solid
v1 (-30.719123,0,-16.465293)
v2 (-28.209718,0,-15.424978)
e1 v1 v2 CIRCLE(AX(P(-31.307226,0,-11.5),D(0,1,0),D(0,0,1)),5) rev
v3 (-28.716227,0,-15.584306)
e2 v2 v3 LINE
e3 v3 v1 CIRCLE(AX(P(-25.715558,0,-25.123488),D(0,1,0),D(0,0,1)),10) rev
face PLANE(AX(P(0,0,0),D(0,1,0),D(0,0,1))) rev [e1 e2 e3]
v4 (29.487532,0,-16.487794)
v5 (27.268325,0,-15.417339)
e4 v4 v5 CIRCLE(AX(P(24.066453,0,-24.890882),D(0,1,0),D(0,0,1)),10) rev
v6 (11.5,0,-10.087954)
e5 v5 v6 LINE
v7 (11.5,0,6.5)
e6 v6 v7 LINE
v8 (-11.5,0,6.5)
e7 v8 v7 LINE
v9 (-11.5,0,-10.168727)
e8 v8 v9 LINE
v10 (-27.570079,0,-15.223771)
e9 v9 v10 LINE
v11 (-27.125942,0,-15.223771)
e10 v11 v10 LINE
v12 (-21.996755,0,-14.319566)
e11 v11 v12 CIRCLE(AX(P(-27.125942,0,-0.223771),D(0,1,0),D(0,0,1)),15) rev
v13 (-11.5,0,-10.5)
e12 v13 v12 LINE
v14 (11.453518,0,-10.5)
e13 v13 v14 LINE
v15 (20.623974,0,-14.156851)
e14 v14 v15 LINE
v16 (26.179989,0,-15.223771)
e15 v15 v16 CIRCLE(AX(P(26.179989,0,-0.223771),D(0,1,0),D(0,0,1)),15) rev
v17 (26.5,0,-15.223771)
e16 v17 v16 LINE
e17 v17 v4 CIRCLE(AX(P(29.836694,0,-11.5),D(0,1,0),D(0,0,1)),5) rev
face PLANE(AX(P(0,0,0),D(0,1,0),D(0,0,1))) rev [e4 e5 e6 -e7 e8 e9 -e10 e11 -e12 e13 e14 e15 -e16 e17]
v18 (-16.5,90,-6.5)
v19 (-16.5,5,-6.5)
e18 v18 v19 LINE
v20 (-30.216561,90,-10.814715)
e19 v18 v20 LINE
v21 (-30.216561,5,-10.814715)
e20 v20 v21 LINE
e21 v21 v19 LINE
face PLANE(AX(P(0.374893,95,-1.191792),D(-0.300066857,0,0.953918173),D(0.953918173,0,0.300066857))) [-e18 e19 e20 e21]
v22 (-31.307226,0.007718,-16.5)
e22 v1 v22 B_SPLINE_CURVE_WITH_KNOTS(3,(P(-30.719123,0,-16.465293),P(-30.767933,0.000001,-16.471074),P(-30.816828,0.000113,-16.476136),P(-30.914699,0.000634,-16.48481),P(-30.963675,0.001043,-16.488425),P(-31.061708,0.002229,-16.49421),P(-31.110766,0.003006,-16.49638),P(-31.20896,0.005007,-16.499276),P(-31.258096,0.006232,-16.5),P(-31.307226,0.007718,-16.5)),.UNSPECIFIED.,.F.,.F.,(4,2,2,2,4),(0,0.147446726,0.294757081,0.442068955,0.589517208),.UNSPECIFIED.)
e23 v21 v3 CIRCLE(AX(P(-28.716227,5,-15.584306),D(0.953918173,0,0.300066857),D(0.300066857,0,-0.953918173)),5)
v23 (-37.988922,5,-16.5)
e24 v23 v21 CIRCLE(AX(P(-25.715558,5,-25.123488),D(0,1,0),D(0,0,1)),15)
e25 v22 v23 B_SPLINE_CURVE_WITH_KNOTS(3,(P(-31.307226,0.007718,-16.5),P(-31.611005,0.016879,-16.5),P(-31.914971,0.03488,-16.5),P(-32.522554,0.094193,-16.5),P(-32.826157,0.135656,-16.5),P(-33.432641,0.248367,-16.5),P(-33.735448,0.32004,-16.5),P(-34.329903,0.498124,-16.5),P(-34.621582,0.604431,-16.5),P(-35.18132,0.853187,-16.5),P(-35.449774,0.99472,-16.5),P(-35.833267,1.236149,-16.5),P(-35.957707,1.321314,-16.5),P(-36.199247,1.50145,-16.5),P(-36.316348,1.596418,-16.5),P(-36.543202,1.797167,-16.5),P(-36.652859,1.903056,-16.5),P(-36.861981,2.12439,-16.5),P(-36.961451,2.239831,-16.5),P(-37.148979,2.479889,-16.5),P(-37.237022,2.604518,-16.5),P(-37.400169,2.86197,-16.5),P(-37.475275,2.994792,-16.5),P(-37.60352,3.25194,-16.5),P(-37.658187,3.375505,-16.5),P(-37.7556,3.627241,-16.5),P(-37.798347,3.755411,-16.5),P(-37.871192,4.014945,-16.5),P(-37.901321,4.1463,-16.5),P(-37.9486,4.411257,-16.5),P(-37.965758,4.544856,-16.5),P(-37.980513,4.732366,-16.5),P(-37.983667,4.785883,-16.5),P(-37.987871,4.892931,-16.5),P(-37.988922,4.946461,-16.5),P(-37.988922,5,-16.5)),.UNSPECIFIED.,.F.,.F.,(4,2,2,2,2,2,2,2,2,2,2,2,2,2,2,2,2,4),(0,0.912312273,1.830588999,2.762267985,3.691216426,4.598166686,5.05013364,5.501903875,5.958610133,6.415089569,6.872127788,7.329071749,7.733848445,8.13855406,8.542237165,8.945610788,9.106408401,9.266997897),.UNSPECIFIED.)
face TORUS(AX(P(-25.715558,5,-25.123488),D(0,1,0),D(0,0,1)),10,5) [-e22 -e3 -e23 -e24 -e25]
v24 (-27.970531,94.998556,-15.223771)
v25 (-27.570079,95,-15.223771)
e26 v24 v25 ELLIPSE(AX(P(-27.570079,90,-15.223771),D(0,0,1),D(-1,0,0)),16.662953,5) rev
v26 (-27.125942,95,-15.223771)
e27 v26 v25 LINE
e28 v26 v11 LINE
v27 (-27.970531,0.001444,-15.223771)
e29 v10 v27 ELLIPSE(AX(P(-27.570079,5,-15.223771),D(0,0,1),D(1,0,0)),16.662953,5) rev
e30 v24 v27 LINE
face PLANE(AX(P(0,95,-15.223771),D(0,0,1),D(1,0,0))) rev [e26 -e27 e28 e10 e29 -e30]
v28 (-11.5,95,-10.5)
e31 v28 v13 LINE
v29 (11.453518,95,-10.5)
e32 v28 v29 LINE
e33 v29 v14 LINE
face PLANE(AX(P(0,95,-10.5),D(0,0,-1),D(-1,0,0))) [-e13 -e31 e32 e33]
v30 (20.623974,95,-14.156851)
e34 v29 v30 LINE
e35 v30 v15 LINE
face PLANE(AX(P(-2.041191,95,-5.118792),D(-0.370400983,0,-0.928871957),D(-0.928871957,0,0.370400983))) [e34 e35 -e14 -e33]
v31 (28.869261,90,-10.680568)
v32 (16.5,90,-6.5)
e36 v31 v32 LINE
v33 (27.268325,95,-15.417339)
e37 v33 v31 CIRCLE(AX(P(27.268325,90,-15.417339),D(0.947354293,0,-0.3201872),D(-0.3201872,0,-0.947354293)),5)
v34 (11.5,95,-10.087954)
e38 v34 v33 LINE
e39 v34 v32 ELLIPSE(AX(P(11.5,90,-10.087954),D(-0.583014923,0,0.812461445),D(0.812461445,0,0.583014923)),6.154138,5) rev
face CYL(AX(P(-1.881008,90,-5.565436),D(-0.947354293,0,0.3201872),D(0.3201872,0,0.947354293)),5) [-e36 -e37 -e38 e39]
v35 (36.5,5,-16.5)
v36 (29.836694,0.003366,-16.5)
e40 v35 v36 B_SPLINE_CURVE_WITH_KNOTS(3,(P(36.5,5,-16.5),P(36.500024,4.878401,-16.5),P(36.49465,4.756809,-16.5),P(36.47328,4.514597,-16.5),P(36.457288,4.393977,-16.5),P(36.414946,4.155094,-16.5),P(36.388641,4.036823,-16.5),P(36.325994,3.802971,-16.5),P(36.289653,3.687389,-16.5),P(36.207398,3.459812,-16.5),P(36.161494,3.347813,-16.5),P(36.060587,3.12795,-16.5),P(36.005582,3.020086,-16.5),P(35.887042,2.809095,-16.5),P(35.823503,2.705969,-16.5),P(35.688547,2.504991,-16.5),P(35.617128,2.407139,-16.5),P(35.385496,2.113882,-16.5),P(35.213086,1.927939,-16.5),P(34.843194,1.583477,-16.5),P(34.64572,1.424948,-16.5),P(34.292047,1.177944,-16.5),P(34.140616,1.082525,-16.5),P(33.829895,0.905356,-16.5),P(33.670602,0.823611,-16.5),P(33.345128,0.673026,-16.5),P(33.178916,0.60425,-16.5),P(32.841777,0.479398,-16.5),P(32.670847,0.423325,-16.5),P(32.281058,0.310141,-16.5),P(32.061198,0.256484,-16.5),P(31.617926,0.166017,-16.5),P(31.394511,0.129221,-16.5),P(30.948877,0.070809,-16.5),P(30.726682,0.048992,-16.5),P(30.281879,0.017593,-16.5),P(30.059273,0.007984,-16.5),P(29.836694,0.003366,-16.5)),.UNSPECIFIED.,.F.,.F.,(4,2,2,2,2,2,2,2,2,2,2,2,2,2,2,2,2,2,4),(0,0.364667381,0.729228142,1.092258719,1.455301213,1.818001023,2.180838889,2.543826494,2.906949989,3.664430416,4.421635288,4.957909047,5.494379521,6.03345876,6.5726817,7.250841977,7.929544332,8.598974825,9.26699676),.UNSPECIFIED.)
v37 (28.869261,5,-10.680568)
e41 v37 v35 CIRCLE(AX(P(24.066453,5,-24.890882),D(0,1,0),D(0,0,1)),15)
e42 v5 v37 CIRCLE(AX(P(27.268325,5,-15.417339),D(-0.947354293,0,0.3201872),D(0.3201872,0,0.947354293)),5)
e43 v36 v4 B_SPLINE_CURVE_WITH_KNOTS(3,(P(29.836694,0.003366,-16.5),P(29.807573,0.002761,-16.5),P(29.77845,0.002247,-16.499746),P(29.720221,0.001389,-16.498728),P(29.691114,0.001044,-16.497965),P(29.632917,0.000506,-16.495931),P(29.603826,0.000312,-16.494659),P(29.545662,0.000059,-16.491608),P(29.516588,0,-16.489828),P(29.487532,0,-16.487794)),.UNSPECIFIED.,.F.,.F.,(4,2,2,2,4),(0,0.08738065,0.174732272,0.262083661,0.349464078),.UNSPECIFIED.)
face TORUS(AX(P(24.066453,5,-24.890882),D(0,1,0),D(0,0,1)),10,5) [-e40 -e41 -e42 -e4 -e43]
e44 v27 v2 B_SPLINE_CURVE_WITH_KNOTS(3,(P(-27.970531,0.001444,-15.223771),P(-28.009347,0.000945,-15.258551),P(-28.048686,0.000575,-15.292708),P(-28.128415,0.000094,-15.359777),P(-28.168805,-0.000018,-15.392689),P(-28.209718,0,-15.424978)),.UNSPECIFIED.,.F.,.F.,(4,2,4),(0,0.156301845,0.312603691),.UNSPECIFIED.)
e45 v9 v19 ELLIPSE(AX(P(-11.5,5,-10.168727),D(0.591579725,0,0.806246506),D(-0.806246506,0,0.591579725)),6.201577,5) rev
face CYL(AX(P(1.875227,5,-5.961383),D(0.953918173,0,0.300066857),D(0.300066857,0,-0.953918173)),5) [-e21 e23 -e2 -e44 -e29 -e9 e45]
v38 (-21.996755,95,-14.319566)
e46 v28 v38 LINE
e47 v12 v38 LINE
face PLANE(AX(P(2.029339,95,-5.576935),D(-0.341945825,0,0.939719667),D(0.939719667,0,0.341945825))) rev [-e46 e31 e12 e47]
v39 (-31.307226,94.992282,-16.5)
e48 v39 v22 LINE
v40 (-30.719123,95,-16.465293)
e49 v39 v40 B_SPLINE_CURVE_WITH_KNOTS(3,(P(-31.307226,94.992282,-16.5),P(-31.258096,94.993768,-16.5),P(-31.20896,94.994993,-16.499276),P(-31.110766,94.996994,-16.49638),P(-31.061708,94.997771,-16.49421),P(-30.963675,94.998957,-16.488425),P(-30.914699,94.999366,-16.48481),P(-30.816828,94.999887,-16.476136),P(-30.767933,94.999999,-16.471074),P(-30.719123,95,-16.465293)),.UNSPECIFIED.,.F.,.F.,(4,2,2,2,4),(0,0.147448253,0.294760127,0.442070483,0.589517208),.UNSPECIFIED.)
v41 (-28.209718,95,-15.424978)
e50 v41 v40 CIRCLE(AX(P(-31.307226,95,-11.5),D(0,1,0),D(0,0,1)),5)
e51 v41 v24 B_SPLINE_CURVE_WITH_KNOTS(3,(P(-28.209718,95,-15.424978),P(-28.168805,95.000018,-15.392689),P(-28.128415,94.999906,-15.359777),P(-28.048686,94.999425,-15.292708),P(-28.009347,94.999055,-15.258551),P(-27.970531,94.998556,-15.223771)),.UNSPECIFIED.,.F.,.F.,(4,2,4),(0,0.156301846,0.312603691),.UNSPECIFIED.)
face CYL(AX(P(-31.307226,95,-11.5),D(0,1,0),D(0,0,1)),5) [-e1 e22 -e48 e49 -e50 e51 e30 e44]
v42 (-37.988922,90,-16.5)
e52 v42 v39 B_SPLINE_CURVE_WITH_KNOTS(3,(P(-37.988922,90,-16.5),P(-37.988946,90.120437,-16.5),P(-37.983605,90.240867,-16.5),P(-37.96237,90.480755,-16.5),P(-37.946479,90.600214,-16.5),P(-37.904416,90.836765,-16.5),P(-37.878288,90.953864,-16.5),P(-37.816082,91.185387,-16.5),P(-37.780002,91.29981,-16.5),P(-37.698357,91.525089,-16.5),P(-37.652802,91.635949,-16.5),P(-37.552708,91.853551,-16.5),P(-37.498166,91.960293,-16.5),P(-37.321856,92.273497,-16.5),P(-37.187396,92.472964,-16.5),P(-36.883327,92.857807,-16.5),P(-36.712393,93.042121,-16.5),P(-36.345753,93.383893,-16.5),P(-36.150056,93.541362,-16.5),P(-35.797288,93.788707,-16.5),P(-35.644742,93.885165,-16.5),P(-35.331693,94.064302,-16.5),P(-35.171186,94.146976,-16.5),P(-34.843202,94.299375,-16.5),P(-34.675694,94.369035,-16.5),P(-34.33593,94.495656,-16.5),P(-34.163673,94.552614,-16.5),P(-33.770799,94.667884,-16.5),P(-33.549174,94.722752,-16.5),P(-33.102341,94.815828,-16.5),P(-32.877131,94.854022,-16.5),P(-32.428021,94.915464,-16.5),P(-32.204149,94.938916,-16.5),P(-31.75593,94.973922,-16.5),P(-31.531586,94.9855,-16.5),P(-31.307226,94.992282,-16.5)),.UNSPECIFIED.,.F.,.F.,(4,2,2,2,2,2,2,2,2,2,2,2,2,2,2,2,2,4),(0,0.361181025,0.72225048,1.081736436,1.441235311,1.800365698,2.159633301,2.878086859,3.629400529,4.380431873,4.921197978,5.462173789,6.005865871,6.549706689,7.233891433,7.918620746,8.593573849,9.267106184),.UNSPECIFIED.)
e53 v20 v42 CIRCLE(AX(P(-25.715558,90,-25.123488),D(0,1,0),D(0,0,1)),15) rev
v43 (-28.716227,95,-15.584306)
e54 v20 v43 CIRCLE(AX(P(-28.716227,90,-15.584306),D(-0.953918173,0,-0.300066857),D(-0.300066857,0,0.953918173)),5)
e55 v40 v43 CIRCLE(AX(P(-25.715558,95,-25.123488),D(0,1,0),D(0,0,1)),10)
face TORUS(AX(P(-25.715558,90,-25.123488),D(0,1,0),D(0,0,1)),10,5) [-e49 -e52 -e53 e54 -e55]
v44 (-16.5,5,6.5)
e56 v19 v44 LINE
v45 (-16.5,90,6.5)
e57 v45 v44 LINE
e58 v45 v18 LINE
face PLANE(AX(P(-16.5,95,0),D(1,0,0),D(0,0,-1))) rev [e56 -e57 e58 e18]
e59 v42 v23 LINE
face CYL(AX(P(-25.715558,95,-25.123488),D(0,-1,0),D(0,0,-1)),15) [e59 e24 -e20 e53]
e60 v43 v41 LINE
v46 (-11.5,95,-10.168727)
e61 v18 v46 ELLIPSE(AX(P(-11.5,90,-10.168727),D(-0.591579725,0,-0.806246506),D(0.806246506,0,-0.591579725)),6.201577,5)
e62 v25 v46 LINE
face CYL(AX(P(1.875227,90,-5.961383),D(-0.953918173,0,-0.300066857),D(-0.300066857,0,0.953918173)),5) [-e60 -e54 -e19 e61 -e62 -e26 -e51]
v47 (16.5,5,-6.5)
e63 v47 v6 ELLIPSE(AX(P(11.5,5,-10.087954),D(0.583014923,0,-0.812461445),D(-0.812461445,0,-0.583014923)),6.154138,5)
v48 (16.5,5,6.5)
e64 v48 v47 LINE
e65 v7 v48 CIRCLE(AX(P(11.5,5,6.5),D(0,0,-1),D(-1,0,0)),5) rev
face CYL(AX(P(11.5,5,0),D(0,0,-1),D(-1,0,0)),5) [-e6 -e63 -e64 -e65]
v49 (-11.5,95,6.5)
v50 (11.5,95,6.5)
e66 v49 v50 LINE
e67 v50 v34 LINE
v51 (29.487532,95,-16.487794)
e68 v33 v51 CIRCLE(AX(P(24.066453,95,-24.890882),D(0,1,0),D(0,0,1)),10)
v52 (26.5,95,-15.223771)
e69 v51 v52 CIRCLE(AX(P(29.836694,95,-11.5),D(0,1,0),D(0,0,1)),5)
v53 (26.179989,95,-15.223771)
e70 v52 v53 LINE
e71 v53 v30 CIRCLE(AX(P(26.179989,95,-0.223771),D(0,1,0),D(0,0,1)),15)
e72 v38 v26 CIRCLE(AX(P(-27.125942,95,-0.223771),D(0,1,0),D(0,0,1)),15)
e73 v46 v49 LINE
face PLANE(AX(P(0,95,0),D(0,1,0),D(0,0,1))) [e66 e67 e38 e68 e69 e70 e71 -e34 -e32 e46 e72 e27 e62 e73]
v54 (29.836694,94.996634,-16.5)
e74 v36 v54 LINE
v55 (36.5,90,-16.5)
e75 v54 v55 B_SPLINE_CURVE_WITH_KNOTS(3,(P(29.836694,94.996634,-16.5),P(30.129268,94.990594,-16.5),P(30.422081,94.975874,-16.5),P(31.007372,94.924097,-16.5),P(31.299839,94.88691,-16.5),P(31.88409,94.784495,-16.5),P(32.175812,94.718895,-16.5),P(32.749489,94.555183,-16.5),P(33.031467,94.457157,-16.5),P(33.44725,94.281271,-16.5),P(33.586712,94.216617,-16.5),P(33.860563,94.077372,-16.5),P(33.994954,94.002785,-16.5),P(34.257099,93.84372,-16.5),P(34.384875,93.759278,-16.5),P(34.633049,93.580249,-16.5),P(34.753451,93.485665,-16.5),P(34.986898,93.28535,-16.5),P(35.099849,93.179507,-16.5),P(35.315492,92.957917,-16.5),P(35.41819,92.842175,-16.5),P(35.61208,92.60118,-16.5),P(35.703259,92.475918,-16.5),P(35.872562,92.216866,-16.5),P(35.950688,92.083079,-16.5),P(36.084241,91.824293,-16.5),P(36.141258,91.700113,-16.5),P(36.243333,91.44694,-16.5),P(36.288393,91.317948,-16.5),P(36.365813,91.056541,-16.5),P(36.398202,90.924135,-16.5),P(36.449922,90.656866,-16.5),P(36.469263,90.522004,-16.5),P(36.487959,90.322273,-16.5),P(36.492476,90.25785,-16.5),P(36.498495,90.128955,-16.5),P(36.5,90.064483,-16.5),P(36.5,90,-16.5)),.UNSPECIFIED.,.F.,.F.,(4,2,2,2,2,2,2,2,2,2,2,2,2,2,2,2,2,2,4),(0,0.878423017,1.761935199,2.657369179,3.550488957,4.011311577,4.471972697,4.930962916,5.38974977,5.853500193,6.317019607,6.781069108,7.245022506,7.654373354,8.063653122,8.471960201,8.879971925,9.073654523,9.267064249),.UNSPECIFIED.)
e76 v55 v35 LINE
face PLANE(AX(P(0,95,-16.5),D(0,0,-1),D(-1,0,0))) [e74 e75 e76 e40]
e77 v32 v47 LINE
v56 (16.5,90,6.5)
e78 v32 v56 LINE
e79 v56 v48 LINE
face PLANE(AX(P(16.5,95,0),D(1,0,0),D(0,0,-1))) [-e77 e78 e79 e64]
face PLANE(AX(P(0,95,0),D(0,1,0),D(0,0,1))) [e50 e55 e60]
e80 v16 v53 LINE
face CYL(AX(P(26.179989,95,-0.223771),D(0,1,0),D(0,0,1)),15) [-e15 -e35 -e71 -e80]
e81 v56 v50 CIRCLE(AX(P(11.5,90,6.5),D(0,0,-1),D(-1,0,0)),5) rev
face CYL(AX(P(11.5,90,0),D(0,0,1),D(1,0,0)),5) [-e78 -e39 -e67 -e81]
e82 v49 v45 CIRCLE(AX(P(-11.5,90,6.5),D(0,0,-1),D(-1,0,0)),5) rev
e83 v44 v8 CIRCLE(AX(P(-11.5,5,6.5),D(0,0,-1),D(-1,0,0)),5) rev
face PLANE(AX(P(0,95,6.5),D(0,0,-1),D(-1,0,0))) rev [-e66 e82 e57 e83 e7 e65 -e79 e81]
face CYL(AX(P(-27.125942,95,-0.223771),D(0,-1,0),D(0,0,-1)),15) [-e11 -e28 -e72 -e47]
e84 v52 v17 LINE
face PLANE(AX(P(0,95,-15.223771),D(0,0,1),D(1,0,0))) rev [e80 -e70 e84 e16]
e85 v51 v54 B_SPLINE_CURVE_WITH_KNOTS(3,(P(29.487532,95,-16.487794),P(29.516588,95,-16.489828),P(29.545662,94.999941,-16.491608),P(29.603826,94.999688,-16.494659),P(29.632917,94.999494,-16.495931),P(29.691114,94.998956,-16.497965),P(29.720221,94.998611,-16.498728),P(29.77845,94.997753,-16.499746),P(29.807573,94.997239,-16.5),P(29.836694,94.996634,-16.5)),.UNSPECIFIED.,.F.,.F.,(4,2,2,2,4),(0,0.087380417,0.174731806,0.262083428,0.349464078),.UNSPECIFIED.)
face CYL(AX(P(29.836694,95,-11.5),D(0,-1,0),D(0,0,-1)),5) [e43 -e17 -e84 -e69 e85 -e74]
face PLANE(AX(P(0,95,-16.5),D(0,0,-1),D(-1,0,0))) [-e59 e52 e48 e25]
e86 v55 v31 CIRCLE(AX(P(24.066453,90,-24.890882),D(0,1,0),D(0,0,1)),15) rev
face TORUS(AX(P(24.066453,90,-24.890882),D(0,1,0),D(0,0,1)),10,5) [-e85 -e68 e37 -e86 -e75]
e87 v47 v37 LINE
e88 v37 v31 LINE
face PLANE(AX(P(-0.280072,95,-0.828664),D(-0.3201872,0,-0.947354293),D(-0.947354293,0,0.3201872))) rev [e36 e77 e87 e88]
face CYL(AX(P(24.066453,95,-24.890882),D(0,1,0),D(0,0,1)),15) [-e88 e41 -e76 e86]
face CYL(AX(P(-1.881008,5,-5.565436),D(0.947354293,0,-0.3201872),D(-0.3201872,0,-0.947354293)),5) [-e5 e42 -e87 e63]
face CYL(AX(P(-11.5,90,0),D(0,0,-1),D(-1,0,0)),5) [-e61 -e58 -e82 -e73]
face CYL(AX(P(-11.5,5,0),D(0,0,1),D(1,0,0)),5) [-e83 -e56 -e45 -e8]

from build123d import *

# Parameters (mm, degrees)
BOSS_EXTRUDE5_DEPTH = 95
FILLET16_R          = 15
FILLET17_R          = 15
FILLET18_R          = 15
FILLET19_R          = 15
FILLET21_R          = 5
FILLET22_R          = 5
FILLET23_R          = 5
FILLET24_R          = 5
FILLET25_R          = 5
FILLET26_R          = 5
FILLET28_R          = 5
FILLET29_R          = 5
FILLET30_R          = 5
FILLET31_R          = 5


with BuildPart() as part:
    # Sketch2 → Boss-Extrude5 (new body)
    with BuildSketch(Plane(origin=(0, 0, 0), x_dir=(1, 0, 0), z_dir=(0, 1, 0))):
        Polygon((-11.5, 10.5), (11.453517933, 10.5), (23.299541019, 15.223771191), (26.5, 15.223771191), (26.5, 16.5), (36.5, 16.5), (36.5, 13.259608353), (16.5, 6.5), (16.5, -6.5), (-16.5, -6.5), (-16.5, 6.5), (-37.988921901, 13.259608353), (-37.988921901, 16.5), (-27.988921901, 16.5), (-27.970531324, 16.5), (-27.970531324, 16.440454109), (-27.970531324, 15.223771191), (-24.481649041, 15.223771191), align=None)
    extrude(amount=BOSS_EXTRUDE5_DEPTH)

    # Fillet16
    # the kernel refuses this fillet: 15 mm, written as the material it takes off along each edge
    with BuildSketch(Plane(origin=(36.5, -20.136972883, -13.259608353), x_dir=(-0.9473542933434234, 0, 0.3201871997500573), z_dir=(0, 1, 0))) as fillet16_piece_1:
        with BuildLine():
            CenterArc((8.054789153, -15), FILLET16_R, 90, 37.311981857)
            Line((-1.037531927, -3.069798938), (-1.219378349, -2.831194917))
            ThreePointArc((-1.219378349, -2.831194917), (-0.802972252, -1.438843309), (-0.284206288, 0.09605616))
            Line((-0.284206288, 0.09605616), (0, 0.3))
            Line((0, 0.3), (8.054789153, 0.3))
            Line((8.054789153, 0.3), (8.054789153, 0))
        make_face()
    extrude(amount=135.273945765, mode=Mode.SUBTRACT)

    # Fillet17
    # the kernel refuses this fillet: 15 mm, written as the material it takes off along each edge
    with BuildSketch(Plane(origin=(-37.988921901, -20.369568994, -13.259608353), x_dir=(0, 0, -1), z_dir=(0, 1, 0))) as fillet17_piece_1:
        with BuildLine():
            CenterArc((11.863879582, -12.273363672), FILLET17_R, 125.092573115, 37.445808138)
            Line((-2.444893018, -7.772360819), (-2.73106847, -7.682340761))
            Line((-2.73106847, -7.682340761), (-0.286175452, 0.090020057))
            Line((-0.286175452, 0.090020057), (0, 0.3))
            ThreePointArc((0, 0.3), (1.620195823, 0.3), (3.067921888, 0.245467273))
            Line((3.067921888, 0.245467273), (3.240391647, 0))
        make_face()
    extrude(amount=135.739137989, mode=Mode.SUBTRACT)

    # Fillet18
    fillet18_edges = [part.edges().sort_by_distance(p)[0] for p in [
        (23.299541019, 47.5, -15.223771191),
    ]]
    fillet(fillet18_edges, radius=FILLET18_R)

    # Fillet19
    fillet19_edges = [part.edges().sort_by_distance(p)[0] for p in [
        (-24.481649041, 47.5, -15.223771191),
    ]]
    fillet(fillet19_edges, radius=FILLET19_R)

    # Fillet21
    # the kernel refuses this fillet: 5 mm, written as the material it takes off along each edge
    with BuildSketch(Plane(origin=(26.5, -8.341735474, -16.5), x_dir=(0, 0, 1), z_dir=(0, 1, 0))) as fillet21_piece_1:
        with BuildLine():
            CenterArc((5, 3.33669419), FILLET21_R, 180, 41.862005804)
            Line((0, 3.33669419), (-0.1, 3.33669419))
            Line((-0.1, 3.33669419), (-0.1, 0))
            Line((-0.1, 0), (0, -0.1))
            ThreePointArc((0, -0.1), (0.638114404, -0.1), (1.201753385, -0.066733884))
            Line((1.201753385, -0.066733884), (1.276228809, 0))
        make_face()
    extrude(amount=111.683470949, mode=Mode.SUBTRACT)

    # Fillet22
    # the kernel refuses this fillet: 5 mm, written as the material it takes off along each edge
    with BuildSketch(Plane(origin=(-27.970531324, -8.341735474, -16.5), x_dir=(0, 0, 1), z_dir=(0, 1, 0))) as fillet22_piece_1:
        with BuildLine():
            CenterArc((5, -3.33669419), FILLET22_R, 138.137994196, 41.862005804)
            Line((0, -3.33669419), (-0.1, -3.33669419))
            Line((-0.1, -3.33669419), (-0.1, 0))
            Line((-0.1, 0), (0, 0.1))
            ThreePointArc((0, 0.1), (0.638114404, 0.1), (1.201753385, 0.066733884))
            Line((1.201753385, 0.066733884), (1.276228809, 0))
        make_face()
    extrude(amount=111.683470949, mode=Mode.SUBTRACT)

    # Fillet23
    # the kernel refuses this fillet: 5 mm, written as the material it takes off along each edge
    with BuildSketch(Plane(origin=(-4.576022833, 0, -2.749164289), x_dir=(0.3000668568991913, 0, -0.9539181733202489), z_dir=(-0.9539181733202489, 0, -0.3000668568991913))) as fillet23_piece_1_section:
        with BuildLine():
            CenterArc((FILLET23_R, -FILLET23_R), FILLET23_R, 90, 90)
            Line((0, -FILLET23_R), (-FILLET23_R * 0.02, -FILLET23_R))
            Line((-FILLET23_R * 0.02, -FILLET23_R), (-FILLET23_R * 0.02, FILLET23_R * 0.02))
            Line((-FILLET23_R * 0.02, FILLET23_R * 0.02), (FILLET23_R, FILLET23_R * 0.02))
            Line((FILLET23_R, FILLET23_R * 0.02), (FILLET23_R, 0))
        make_face()
    fillet23_piece_1 = extrude(amount=26.879179961, mode=Mode.PRIVATE)
    fillet23_piece_1 = split(fillet23_piece_1, bisect_by=Plane(origin=(-16.5, 1.14737311, -9.7645004), z_dir=(-1, 0, 0)), keep=Keep.TOP, mode=Mode.PRIVATE)
    add(fillet23_piece_1, mode=Mode.SUBTRACT)
    with BuildSketch(Plane(origin=(-25.715558229, 0, -25.123487935), x_dir=(-0.3000668568991974, 0, 0.9539181733202469), z_dir=(0.9539181733202469, 0, 0.3000668568991974))) as fillet23_piece_2_section:
        with BuildLine():
            CenterArc((15 - FILLET23_R, -FILLET23_R), FILLET23_R, 0, 90)
            Line((15, -FILLET23_R), (15 + FILLET23_R * 0.02, -FILLET23_R))
            Line((15 + FILLET23_R * 0.02, -FILLET23_R), (15 + FILLET23_R * 0.02, FILLET23_R * 0.02))
            Line((15 + FILLET23_R * 0.02, FILLET23_R * 0.02), (15 - FILLET23_R, FILLET23_R * 0.02))
            Line((15 - FILLET23_R, FILLET23_R * 0.02), (15 - FILLET23_R, 0))
        make_face()
    fillet23_piece_2 = revolve(axis=Axis((-25.715558229, 0, -25.123487935), (0, -1, 0)), revolution_arc=85.195610564, mode=Mode.PRIVATE)
    fillet23_piece_2 = split(fillet23_piece_2, bisect_by=Plane(origin=(-33.617328681, 1.250053693, -16.5), z_dir=(0, 0, 1)), keep=Keep.TOP, mode=Mode.PRIVATE)
    add(fillet23_piece_2, mode=Mode.SUBTRACT)

    # Fillet24
    fillet24_edges = [part.edges().sort_by_distance(p)[0] for p in [
        (22.684630457, 0, -8.590283985),
        (33.162574695, 0, -12.963578877),
    ]]
    fillet(fillet24_edges, radius=FILLET24_R)

    # Fillet25
    fillet25_edges = [part.edges().sort_by_distance(p)[0] for p in [
        (33.162574695, 95, -12.963578877),
        (22.684630457, 95, -8.590283985),
    ]]
    fillet(fillet25_edges, radius=FILLET25_R)

    # Fillet26
    # the kernel refuses this fillet: 5 mm, written as the material it takes off along each edge
    with BuildSketch(Plane(origin=(-25.715558229, 95, -25.123487935), x_dir=(-0.3000668568991974, 0, 0.9539181733202469), z_dir=(0.9539181733202469, 0, 0.3000668568991974))) as fillet26_piece_1:
        with BuildLine():
            CenterArc((15 - FILLET26_R, FILLET26_R), FILLET26_R, 270, 90)
            Line((15, FILLET26_R), (15, 0))
            Line((15, 0), (15 - FILLET26_R, 0))
        make_face()
    revolve(axis=Axis((-25.715558229, 95, -25.123487935), (0, -1, 0)), revolution_arc=85.195610564, mode=Mode.SUBTRACT)
    with BuildSketch(Plane(origin=(-4.576022833, 95, -2.749164289), x_dir=(0.3000668568991913, 0, -0.9539181733202489), z_dir=(-0.9539181733202489, 0, -0.3000668568991913))) as fillet26_piece_2_section:
        with BuildLine():
            CenterArc((FILLET26_R, FILLET26_R), FILLET26_R, 180, 90)
            Line((0, FILLET26_R), (0, 0))
            Line((0, 0), (FILLET26_R, 0))
        make_face()
    fillet26_piece_2 = extrude(amount=26.879179961, mode=Mode.PRIVATE)
    fillet26_piece_2 = split(fillet26_piece_2, bisect_by=Plane(origin=(-16.5, 93.85262689, -9.7645004), z_dir=(-1, 0, 0)), keep=Keep.TOP, mode=Mode.PRIVATE)
    add(fillet26_piece_2, mode=Mode.SUBTRACT)

    # Fillet28
    fillet28_edges = [part.edges().sort_by_distance(p)[0] for p in [
        (16.5, 0, -2.638928242),
    ]]
    fillet(fillet28_edges, radius=FILLET28_R)

    # Fillet29
    fillet29_edges = [part.edges().sort_by_distance(p)[0] for p in [
        (-16.5, 0, -2.620769863),
    ]]
    fillet(fillet29_edges, radius=FILLET29_R)

    # Fillet30
    fillet30_edges = [part.edges().sort_by_distance(p)[0] for p in [
        (-16.5, 95, -2.620769863),
    ]]
    fillet(fillet30_edges, radius=FILLET30_R)

    # Fillet31
    fillet31_edges = [part.edges().sort_by_distance(p)[0] for p in [
        (16.5, 95, -2.638928242),
    ]]
    fillet(fillet31_edges, radius=FILLET31_R)


solid = part.part
